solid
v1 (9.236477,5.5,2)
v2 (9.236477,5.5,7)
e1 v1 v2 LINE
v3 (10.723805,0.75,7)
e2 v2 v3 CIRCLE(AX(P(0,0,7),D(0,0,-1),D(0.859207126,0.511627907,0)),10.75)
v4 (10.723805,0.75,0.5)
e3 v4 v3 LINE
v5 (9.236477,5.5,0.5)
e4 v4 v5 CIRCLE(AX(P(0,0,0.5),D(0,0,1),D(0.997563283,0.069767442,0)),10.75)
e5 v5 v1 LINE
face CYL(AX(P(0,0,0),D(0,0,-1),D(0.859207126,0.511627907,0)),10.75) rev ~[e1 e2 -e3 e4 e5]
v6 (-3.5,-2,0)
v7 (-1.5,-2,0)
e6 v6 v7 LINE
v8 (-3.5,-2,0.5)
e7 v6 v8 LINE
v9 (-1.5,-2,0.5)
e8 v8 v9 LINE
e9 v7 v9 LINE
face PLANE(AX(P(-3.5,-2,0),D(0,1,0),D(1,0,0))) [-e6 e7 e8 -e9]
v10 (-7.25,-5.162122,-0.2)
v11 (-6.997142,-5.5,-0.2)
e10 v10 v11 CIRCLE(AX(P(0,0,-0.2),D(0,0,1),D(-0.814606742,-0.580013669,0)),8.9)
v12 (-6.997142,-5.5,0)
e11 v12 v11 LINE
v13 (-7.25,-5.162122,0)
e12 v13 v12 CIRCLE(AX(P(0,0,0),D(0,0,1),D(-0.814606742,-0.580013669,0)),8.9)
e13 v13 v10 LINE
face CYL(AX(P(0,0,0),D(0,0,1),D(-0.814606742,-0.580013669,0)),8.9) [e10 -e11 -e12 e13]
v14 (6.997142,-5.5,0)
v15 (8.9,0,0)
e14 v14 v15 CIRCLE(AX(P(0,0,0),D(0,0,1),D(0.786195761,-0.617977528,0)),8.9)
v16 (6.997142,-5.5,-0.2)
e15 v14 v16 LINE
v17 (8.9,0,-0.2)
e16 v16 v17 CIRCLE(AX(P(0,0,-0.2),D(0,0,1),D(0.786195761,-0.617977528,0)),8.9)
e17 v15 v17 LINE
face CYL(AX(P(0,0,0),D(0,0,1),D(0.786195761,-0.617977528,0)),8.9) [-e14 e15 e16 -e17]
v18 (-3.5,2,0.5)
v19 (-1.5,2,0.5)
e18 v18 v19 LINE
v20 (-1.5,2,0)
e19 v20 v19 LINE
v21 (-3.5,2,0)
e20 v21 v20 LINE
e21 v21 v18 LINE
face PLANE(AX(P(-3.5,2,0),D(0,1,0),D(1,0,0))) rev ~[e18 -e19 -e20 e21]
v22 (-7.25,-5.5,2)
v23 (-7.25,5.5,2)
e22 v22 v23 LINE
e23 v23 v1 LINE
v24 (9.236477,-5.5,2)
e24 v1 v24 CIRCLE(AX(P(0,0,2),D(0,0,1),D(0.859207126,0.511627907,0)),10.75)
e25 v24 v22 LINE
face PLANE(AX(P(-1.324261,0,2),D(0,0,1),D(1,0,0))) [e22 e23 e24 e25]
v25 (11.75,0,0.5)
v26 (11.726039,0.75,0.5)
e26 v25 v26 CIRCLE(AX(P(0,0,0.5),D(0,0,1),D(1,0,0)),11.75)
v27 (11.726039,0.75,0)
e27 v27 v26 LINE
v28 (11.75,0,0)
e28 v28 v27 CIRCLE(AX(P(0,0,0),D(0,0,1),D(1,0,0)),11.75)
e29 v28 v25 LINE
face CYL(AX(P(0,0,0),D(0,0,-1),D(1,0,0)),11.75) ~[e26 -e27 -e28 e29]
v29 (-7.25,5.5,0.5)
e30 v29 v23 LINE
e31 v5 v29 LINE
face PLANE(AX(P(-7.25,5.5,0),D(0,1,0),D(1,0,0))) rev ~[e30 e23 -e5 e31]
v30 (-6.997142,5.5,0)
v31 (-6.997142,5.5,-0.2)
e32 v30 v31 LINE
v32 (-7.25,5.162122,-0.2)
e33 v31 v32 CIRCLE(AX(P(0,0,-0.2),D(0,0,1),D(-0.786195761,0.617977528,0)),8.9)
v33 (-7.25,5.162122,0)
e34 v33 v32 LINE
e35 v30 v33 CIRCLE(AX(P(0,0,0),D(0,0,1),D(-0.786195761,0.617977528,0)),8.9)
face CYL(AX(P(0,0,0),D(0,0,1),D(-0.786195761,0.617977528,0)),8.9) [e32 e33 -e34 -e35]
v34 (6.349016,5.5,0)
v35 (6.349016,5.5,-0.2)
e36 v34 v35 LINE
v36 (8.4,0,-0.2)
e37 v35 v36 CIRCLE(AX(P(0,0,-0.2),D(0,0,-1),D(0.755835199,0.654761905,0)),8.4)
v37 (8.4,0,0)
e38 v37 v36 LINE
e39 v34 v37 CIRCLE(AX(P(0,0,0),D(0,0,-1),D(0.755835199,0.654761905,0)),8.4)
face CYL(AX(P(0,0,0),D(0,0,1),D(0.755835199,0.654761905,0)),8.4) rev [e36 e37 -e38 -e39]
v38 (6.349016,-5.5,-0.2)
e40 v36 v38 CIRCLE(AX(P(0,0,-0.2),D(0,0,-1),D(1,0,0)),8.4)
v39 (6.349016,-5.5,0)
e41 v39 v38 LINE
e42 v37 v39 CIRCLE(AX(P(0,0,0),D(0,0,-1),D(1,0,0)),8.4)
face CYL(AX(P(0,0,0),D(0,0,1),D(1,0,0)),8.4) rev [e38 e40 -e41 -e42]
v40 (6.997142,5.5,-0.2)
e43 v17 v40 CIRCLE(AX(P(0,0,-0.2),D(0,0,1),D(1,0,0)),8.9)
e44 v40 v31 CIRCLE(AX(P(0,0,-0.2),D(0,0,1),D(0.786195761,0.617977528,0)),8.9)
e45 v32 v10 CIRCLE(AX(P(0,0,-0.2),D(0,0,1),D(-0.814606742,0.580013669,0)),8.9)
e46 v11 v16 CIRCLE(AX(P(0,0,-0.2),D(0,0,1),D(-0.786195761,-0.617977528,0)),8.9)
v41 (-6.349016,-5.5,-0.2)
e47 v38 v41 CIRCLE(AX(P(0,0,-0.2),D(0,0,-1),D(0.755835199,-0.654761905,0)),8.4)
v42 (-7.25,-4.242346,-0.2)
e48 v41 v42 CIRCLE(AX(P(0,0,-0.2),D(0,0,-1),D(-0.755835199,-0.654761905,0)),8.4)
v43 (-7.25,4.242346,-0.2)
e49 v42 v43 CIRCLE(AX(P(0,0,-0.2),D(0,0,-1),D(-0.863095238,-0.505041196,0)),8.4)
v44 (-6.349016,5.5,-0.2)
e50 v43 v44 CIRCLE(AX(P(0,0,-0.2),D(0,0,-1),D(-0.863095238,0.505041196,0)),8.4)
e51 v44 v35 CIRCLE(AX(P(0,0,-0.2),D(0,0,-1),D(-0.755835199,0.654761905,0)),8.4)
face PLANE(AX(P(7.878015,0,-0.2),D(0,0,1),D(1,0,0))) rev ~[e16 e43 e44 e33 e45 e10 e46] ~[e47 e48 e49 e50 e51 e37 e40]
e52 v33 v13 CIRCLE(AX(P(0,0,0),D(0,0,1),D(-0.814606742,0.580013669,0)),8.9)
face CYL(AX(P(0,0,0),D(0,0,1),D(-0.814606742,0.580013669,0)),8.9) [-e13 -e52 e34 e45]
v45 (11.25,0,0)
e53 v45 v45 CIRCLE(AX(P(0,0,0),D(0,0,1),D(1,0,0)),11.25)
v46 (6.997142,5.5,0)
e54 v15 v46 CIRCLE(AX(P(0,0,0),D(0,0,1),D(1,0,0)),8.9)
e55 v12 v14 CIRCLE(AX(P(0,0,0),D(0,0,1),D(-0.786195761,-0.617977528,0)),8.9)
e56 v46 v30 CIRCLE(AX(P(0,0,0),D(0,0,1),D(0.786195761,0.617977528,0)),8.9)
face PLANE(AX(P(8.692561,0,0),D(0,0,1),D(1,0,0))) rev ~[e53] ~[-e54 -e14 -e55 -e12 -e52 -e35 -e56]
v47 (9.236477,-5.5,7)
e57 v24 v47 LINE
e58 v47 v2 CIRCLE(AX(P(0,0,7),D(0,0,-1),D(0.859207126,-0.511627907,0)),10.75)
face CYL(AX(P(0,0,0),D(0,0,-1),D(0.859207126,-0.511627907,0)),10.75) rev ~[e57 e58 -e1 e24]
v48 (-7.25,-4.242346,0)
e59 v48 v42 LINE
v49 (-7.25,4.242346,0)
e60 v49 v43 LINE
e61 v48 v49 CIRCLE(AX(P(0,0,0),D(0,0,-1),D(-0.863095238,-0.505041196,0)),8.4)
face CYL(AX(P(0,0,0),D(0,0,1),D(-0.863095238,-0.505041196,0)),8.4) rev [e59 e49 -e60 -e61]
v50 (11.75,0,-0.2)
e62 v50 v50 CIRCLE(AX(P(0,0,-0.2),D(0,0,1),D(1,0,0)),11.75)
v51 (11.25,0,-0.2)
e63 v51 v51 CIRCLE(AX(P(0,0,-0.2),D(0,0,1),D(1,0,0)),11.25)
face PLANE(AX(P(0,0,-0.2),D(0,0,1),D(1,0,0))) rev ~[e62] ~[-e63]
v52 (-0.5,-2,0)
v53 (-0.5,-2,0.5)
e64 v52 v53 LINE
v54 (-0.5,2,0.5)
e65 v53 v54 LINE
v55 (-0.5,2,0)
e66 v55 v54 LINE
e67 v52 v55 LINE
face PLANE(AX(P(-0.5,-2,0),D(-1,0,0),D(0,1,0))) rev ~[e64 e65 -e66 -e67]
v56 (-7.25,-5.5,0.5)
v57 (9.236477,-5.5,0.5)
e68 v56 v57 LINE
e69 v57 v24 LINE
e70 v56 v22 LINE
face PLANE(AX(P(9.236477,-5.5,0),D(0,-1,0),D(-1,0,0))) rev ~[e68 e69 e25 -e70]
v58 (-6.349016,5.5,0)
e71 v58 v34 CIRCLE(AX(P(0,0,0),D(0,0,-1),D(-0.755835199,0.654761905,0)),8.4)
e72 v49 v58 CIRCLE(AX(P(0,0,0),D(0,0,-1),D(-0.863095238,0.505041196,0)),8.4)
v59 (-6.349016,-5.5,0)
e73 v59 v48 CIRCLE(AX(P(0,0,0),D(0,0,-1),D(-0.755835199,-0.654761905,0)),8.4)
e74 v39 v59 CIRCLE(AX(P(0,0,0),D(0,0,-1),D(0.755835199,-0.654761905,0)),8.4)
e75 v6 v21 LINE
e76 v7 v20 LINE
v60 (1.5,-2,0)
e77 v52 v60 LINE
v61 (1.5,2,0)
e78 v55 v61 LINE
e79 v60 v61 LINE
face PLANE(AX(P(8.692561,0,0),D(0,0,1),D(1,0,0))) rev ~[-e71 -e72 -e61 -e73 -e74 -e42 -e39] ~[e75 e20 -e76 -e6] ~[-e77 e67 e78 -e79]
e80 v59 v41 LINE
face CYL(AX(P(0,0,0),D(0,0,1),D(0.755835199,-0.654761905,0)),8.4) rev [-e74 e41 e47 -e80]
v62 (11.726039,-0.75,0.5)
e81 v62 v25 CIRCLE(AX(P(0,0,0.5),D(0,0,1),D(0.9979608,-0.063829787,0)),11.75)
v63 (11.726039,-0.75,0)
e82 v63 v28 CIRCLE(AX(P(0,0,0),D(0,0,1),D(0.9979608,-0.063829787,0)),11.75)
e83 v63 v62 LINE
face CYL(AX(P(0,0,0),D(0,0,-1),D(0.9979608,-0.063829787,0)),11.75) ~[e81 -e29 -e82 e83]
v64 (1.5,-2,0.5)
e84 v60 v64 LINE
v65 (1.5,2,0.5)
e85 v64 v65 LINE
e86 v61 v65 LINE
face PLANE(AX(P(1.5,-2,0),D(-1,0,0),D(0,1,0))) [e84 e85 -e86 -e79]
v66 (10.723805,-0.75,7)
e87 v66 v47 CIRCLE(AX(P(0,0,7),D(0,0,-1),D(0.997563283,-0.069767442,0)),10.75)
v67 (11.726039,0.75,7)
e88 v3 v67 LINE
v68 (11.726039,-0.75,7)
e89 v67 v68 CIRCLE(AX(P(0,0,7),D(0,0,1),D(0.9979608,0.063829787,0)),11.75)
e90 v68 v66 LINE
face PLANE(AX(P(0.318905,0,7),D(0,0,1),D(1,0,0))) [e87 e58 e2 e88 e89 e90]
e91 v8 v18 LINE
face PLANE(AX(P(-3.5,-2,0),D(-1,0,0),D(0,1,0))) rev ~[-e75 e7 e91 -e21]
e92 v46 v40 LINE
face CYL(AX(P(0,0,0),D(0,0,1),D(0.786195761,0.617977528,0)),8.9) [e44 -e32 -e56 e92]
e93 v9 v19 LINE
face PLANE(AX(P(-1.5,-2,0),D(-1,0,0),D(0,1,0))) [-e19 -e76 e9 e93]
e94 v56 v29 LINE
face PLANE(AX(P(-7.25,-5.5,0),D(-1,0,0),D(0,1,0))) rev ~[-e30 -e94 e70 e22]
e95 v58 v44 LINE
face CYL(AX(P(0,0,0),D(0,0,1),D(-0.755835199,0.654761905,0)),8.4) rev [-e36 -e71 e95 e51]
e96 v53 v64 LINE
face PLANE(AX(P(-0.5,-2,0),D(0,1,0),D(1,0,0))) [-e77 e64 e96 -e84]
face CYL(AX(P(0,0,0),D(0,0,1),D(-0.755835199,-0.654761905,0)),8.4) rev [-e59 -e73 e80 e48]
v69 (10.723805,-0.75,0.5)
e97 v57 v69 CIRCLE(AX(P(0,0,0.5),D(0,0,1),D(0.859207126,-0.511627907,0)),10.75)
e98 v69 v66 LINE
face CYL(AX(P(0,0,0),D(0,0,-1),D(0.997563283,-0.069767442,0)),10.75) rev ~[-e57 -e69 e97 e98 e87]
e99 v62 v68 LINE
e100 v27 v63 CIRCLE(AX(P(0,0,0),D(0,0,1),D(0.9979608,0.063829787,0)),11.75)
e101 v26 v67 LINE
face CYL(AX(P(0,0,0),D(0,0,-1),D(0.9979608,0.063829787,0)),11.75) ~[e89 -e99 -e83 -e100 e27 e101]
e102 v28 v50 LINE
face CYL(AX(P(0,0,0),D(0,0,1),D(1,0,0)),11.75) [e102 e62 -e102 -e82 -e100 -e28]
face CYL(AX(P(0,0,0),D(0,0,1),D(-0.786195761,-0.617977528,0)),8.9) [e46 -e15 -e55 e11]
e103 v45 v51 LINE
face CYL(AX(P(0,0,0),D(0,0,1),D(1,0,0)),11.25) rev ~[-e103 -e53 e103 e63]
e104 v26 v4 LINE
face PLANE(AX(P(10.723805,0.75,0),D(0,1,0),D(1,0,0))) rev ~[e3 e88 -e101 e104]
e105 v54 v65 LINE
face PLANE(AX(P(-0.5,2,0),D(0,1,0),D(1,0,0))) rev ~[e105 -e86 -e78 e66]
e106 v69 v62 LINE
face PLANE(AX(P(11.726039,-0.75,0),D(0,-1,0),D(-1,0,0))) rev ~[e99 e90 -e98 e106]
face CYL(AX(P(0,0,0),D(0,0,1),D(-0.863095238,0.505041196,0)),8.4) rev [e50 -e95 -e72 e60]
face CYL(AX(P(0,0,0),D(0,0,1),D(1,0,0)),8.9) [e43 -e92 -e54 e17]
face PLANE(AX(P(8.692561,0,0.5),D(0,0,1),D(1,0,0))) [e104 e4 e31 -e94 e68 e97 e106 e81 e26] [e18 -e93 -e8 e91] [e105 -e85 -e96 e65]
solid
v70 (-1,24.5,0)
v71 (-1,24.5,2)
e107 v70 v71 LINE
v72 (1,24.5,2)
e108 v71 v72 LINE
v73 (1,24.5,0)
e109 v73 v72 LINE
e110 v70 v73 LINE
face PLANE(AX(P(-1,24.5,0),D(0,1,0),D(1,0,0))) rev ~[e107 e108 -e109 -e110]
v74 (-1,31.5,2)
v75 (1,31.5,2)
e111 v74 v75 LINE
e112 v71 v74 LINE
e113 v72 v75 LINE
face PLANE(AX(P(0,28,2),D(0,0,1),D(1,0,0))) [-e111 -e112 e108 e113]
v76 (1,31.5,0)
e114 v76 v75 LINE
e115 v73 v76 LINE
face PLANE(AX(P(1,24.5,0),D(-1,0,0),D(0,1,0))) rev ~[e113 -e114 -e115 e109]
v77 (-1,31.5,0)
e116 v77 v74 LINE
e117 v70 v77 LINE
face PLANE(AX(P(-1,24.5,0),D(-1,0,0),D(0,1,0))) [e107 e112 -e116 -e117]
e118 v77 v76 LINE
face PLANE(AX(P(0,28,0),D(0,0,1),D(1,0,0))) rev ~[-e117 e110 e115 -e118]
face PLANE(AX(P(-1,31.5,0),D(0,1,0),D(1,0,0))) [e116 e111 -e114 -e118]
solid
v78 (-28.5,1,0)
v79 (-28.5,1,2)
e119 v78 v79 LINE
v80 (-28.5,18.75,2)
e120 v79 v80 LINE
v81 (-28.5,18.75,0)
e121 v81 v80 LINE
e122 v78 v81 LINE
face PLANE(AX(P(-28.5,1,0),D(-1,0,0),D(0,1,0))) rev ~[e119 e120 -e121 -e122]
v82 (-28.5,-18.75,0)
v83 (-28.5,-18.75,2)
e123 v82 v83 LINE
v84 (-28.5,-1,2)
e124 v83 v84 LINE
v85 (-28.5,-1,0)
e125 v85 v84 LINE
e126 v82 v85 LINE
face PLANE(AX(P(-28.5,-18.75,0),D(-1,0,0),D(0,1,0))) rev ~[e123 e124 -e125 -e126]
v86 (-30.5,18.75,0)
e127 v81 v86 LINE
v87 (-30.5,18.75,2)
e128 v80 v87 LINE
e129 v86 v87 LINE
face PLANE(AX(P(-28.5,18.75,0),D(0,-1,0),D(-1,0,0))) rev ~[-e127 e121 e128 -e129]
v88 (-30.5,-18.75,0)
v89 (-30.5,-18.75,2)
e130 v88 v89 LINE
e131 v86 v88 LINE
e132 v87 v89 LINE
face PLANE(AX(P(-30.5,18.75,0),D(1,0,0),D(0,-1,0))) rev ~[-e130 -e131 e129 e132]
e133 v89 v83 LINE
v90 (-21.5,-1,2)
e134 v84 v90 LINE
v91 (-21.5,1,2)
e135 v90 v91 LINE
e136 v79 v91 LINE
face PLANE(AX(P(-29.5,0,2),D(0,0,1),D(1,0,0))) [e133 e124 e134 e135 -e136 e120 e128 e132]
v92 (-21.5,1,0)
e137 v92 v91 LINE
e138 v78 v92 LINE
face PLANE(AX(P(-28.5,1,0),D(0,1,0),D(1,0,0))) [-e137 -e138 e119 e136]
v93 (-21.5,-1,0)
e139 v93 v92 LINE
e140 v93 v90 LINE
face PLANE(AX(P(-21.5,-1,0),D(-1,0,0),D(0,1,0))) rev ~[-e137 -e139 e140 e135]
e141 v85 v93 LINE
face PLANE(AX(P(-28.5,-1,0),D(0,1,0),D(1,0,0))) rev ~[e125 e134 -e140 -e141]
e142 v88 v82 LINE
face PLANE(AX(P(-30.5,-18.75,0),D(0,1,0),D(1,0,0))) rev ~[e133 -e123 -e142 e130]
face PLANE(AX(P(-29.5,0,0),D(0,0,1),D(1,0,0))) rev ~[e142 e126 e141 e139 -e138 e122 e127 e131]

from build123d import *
from build123d import SkipClean  # not in build123d's __all__

# Parameters (mm, degrees)
F2_DEPTH = 7
F3_DEPTH = 2
F0_W     = 14.5
F0_H     = 11
F0_W_2   = 2
F0_H_2   = 4
F4_DEPTH = 0.5
F5_DEPTH = 0.5
F1_R     = 11.75
F1_R_2   = 11.25
F6_DEPTH = 0.2
F7_W     = 7
F7_H     = 2
F8_DEPTH = 2
F7_W_2   = 2
F7_H_2   = 7


with BuildPart() as f2:
    # F0 (on Top) → F2 (new body)
    with BuildSketch(Plane.XY):
        with BuildLine():
            ThreePointArc((9.236476601, 5.5), (10.258841959, 3.2122673707), (10.7238052948, 0.75))
            Line((10.7238052948, 0.75), (11.7260393996, 0.75))
            ThreePointArc((11.7260393996, 0.75), (-11.75, 0), (11.7260393996, -0.75))
            Line((11.7260393996, -0.75), (10.7238052948, -0.75))
            ThreePointArc((10.7238052948, -0.75), (10.258841959, -3.2122673707), (9.236476601, -5.5))
            ThreePointArc((9.236476601, -5.5), (-10.75, 0), (9.236476601, 5.5))
        make_face()
    extrude(amount=F2_DEPTH)

    # F0 (on Top) → F3 (join)
    with BuildSketch(Plane.XY):
        with BuildLine():
            Line((7.25, 5.5), (9.236476601, 5.5))
            ThreePointArc((9.236476601, 5.5), (-10.75, 0), (9.236476601, -5.5))
            Line((9.236476601, -5.5), (7.25, -5.5))
            Line((7.25, -5.5), (-7.25, -5.5))
            Line((-7.25, -5.5), (-7.25, 5.5))
            Line((-7.25, 5.5), (7.25, 5.5))
        make_face()
    extrude(amount=F3_DEPTH)

    # F0 (on Top) → F4 (join)
    with BuildSketch(Plane.XY):
        Rectangle(F0_W, F0_H)
        with Locations((-2.5, 0)):
            Rectangle(F0_W_2, F0_H_2, mode=Mode.SUBTRACT)
        with Locations((0.5, 0)):
            Rectangle(F0_W_2, F0_H_2, mode=Mode.SUBTRACT)
    extrude(amount=F4_DEPTH)

    # F0 (on Top) → F5 (join)
    with BuildSketch(Plane.XY):
        with BuildLine():
            ThreePointArc((10.7238052948, -0.75), (10.7434493278, -0.3752286512), (10.75, 0))
            ThreePointArc((10.75, 0), (10.7434493278, 0.3752286512), (10.7238052948, 0.75))
            ThreePointArc((10.7238052948, 0.75), (10.258841959, 3.2122673707), (9.236476601, 5.5))
            Line((9.236476601, 5.5), (7.25, 5.5))
            Line((7.25, 5.5), (7.25, -5.5))
            Line((7.25, -5.5), (9.236476601, -5.5))
            ThreePointArc((9.236476601, -5.5), (10.258841959, -3.2122673707), (10.7238052948, -0.75))
        make_face()
        with BuildLine():
            ThreePointArc((10.7238052948, 0.75), (10.7434493278, 0.3752286512), (10.75, 0))
            ThreePointArc((10.75, 0), (10.7434493278, -0.3752286512), (10.7238052948, -0.75))
            Line((10.7238052948, -0.75), (11.7260393996, -0.75))
            ThreePointArc((11.7260393996, -0.75), (11.7440083222, -0.3751913213), (11.75, 0))
            ThreePointArc((11.75, 0), (11.7440083222, 0.3751913213), (11.7260393996, 0.75))
            Line((11.7260393996, 0.75), (10.7238052948, 0.75))
        make_face()
    extrude(amount=F5_DEPTH)

    # F1 (on face) → F6 (join)
    with BuildSketch(Plane.XY):
        Circle(F1_R)
        Circle(F1_R_2, mode=Mode.SUBTRACT)
        with BuildLine():
            ThreePointArc((6.9971422738, -5.5), (8.4108431871, -2.9099341713), (8.9, 0))
            ThreePointArc((8.9, 0), (8.4108431871, 2.9099341713), (6.9971422738, 5.5))
            Line((6.9971422738, 5.5), (6.3490156717, 5.5))
            ThreePointArc((6.3490156717, 5.5), (7.8705695995, 2.9349845278), (8.4, 0))
            ThreePointArc((8.4, 0), (7.8705695995, -2.9349845278), (6.3490156717, -5.5))
            Line((6.3490156717, -5.5), (6.9971422738, -5.5))
        make_face()
        with BuildLine():
            ThreePointArc((-6.9971422738, -5.5), (0, -8.9), (6.9971422738, -5.5))
            Line((6.9971422738, -5.5), (6.3490156717, -5.5))
            ThreePointArc((6.3490156717, -5.5), (0, -8.4), (-6.3490156717, -5.5))
            Line((-6.3490156717, -5.5), (-6.9971422738, -5.5))
        make_face()
        with BuildLine():
            ThreePointArc((-7.25, -5.1621216568), (-7.1255740952, -5.3325597806), (-6.9971422738, -5.5))
            Line((-6.9971422738, -5.5), (-6.3490156717, -5.5))
            ThreePointArc((-6.3490156717, -5.5), (-6.8285232792, -4.8919597121), (-7.25, -4.2423460491))
            Line((-7.25, -4.2423460491), (-7.25, -5.1621216568))
        make_face()
        with BuildLine():
            Line((-7.25, 4.2423460491), (-7.25, 5.1621216568))
            ThreePointArc((-7.25, 5.1621216568), (-8.9, 0), (-7.25, -5.1621216568))
            Line((-7.25, -5.1621216568), (-7.25, -4.2423460491))
            ThreePointArc((-7.25, -4.2423460491), (-8.4, 0), (-7.25, 4.2423460491))
        make_face()
        with BuildLine():
            Line((6.3490156717, 5.5), (6.9971422738, 5.5))
            ThreePointArc((6.9971422738, 5.5), (0, 8.9), (-6.9971422738, 5.5))
            Line((-6.9971422738, 5.5), (-6.3490156717, 5.5))
            ThreePointArc((-6.3490156717, 5.5), (0, 8.4), (6.3490156717, 5.5))
        make_face()
        with BuildLine():
            Line((-6.3490156717, 5.5), (-6.9971422738, 5.5))
            ThreePointArc((-6.9971422738, 5.5), (-7.1255740952, 5.3325597806), (-7.25, 5.1621216568))
            Line((-7.25, 5.1621216568), (-7.25, 4.2423460491))
            ThreePointArc((-7.25, 4.2423460491), (-6.8285232792, 4.8919597121), (-6.3490156717, 5.5))
        make_face()
    with SkipClean():  # cleaning this boolean's faces spoils the solid; the shape is the same uncleaned
        extrude(amount=-F6_DEPTH)


with BuildPart() as f8:
    # F7 (on Top) → F8 (new body)
    with BuildSketch(Plane.XY):
        Polygon((-28.5, 18.75), (-30.5, 18.75), (-30.5, -18.75), (-28.5, -18.75), (-28.5, -1), (-28.5, 1), align=None)
        with Locations((-25, 0)):
            Rectangle(F7_W, F7_H)
    extrude(amount=F8_DEPTH)


with BuildPart() as f8b:
    # F7 (on Top) → F8, piece 2 (new body)
    with BuildSketch(Plane.XY):
        with Locations((0, 28)):
            Rectangle(F7_W_2, F7_H_2)
    extrude(amount=F8_DEPTH)


solid = Compound([f2.part, f8.part, f8b.part])
